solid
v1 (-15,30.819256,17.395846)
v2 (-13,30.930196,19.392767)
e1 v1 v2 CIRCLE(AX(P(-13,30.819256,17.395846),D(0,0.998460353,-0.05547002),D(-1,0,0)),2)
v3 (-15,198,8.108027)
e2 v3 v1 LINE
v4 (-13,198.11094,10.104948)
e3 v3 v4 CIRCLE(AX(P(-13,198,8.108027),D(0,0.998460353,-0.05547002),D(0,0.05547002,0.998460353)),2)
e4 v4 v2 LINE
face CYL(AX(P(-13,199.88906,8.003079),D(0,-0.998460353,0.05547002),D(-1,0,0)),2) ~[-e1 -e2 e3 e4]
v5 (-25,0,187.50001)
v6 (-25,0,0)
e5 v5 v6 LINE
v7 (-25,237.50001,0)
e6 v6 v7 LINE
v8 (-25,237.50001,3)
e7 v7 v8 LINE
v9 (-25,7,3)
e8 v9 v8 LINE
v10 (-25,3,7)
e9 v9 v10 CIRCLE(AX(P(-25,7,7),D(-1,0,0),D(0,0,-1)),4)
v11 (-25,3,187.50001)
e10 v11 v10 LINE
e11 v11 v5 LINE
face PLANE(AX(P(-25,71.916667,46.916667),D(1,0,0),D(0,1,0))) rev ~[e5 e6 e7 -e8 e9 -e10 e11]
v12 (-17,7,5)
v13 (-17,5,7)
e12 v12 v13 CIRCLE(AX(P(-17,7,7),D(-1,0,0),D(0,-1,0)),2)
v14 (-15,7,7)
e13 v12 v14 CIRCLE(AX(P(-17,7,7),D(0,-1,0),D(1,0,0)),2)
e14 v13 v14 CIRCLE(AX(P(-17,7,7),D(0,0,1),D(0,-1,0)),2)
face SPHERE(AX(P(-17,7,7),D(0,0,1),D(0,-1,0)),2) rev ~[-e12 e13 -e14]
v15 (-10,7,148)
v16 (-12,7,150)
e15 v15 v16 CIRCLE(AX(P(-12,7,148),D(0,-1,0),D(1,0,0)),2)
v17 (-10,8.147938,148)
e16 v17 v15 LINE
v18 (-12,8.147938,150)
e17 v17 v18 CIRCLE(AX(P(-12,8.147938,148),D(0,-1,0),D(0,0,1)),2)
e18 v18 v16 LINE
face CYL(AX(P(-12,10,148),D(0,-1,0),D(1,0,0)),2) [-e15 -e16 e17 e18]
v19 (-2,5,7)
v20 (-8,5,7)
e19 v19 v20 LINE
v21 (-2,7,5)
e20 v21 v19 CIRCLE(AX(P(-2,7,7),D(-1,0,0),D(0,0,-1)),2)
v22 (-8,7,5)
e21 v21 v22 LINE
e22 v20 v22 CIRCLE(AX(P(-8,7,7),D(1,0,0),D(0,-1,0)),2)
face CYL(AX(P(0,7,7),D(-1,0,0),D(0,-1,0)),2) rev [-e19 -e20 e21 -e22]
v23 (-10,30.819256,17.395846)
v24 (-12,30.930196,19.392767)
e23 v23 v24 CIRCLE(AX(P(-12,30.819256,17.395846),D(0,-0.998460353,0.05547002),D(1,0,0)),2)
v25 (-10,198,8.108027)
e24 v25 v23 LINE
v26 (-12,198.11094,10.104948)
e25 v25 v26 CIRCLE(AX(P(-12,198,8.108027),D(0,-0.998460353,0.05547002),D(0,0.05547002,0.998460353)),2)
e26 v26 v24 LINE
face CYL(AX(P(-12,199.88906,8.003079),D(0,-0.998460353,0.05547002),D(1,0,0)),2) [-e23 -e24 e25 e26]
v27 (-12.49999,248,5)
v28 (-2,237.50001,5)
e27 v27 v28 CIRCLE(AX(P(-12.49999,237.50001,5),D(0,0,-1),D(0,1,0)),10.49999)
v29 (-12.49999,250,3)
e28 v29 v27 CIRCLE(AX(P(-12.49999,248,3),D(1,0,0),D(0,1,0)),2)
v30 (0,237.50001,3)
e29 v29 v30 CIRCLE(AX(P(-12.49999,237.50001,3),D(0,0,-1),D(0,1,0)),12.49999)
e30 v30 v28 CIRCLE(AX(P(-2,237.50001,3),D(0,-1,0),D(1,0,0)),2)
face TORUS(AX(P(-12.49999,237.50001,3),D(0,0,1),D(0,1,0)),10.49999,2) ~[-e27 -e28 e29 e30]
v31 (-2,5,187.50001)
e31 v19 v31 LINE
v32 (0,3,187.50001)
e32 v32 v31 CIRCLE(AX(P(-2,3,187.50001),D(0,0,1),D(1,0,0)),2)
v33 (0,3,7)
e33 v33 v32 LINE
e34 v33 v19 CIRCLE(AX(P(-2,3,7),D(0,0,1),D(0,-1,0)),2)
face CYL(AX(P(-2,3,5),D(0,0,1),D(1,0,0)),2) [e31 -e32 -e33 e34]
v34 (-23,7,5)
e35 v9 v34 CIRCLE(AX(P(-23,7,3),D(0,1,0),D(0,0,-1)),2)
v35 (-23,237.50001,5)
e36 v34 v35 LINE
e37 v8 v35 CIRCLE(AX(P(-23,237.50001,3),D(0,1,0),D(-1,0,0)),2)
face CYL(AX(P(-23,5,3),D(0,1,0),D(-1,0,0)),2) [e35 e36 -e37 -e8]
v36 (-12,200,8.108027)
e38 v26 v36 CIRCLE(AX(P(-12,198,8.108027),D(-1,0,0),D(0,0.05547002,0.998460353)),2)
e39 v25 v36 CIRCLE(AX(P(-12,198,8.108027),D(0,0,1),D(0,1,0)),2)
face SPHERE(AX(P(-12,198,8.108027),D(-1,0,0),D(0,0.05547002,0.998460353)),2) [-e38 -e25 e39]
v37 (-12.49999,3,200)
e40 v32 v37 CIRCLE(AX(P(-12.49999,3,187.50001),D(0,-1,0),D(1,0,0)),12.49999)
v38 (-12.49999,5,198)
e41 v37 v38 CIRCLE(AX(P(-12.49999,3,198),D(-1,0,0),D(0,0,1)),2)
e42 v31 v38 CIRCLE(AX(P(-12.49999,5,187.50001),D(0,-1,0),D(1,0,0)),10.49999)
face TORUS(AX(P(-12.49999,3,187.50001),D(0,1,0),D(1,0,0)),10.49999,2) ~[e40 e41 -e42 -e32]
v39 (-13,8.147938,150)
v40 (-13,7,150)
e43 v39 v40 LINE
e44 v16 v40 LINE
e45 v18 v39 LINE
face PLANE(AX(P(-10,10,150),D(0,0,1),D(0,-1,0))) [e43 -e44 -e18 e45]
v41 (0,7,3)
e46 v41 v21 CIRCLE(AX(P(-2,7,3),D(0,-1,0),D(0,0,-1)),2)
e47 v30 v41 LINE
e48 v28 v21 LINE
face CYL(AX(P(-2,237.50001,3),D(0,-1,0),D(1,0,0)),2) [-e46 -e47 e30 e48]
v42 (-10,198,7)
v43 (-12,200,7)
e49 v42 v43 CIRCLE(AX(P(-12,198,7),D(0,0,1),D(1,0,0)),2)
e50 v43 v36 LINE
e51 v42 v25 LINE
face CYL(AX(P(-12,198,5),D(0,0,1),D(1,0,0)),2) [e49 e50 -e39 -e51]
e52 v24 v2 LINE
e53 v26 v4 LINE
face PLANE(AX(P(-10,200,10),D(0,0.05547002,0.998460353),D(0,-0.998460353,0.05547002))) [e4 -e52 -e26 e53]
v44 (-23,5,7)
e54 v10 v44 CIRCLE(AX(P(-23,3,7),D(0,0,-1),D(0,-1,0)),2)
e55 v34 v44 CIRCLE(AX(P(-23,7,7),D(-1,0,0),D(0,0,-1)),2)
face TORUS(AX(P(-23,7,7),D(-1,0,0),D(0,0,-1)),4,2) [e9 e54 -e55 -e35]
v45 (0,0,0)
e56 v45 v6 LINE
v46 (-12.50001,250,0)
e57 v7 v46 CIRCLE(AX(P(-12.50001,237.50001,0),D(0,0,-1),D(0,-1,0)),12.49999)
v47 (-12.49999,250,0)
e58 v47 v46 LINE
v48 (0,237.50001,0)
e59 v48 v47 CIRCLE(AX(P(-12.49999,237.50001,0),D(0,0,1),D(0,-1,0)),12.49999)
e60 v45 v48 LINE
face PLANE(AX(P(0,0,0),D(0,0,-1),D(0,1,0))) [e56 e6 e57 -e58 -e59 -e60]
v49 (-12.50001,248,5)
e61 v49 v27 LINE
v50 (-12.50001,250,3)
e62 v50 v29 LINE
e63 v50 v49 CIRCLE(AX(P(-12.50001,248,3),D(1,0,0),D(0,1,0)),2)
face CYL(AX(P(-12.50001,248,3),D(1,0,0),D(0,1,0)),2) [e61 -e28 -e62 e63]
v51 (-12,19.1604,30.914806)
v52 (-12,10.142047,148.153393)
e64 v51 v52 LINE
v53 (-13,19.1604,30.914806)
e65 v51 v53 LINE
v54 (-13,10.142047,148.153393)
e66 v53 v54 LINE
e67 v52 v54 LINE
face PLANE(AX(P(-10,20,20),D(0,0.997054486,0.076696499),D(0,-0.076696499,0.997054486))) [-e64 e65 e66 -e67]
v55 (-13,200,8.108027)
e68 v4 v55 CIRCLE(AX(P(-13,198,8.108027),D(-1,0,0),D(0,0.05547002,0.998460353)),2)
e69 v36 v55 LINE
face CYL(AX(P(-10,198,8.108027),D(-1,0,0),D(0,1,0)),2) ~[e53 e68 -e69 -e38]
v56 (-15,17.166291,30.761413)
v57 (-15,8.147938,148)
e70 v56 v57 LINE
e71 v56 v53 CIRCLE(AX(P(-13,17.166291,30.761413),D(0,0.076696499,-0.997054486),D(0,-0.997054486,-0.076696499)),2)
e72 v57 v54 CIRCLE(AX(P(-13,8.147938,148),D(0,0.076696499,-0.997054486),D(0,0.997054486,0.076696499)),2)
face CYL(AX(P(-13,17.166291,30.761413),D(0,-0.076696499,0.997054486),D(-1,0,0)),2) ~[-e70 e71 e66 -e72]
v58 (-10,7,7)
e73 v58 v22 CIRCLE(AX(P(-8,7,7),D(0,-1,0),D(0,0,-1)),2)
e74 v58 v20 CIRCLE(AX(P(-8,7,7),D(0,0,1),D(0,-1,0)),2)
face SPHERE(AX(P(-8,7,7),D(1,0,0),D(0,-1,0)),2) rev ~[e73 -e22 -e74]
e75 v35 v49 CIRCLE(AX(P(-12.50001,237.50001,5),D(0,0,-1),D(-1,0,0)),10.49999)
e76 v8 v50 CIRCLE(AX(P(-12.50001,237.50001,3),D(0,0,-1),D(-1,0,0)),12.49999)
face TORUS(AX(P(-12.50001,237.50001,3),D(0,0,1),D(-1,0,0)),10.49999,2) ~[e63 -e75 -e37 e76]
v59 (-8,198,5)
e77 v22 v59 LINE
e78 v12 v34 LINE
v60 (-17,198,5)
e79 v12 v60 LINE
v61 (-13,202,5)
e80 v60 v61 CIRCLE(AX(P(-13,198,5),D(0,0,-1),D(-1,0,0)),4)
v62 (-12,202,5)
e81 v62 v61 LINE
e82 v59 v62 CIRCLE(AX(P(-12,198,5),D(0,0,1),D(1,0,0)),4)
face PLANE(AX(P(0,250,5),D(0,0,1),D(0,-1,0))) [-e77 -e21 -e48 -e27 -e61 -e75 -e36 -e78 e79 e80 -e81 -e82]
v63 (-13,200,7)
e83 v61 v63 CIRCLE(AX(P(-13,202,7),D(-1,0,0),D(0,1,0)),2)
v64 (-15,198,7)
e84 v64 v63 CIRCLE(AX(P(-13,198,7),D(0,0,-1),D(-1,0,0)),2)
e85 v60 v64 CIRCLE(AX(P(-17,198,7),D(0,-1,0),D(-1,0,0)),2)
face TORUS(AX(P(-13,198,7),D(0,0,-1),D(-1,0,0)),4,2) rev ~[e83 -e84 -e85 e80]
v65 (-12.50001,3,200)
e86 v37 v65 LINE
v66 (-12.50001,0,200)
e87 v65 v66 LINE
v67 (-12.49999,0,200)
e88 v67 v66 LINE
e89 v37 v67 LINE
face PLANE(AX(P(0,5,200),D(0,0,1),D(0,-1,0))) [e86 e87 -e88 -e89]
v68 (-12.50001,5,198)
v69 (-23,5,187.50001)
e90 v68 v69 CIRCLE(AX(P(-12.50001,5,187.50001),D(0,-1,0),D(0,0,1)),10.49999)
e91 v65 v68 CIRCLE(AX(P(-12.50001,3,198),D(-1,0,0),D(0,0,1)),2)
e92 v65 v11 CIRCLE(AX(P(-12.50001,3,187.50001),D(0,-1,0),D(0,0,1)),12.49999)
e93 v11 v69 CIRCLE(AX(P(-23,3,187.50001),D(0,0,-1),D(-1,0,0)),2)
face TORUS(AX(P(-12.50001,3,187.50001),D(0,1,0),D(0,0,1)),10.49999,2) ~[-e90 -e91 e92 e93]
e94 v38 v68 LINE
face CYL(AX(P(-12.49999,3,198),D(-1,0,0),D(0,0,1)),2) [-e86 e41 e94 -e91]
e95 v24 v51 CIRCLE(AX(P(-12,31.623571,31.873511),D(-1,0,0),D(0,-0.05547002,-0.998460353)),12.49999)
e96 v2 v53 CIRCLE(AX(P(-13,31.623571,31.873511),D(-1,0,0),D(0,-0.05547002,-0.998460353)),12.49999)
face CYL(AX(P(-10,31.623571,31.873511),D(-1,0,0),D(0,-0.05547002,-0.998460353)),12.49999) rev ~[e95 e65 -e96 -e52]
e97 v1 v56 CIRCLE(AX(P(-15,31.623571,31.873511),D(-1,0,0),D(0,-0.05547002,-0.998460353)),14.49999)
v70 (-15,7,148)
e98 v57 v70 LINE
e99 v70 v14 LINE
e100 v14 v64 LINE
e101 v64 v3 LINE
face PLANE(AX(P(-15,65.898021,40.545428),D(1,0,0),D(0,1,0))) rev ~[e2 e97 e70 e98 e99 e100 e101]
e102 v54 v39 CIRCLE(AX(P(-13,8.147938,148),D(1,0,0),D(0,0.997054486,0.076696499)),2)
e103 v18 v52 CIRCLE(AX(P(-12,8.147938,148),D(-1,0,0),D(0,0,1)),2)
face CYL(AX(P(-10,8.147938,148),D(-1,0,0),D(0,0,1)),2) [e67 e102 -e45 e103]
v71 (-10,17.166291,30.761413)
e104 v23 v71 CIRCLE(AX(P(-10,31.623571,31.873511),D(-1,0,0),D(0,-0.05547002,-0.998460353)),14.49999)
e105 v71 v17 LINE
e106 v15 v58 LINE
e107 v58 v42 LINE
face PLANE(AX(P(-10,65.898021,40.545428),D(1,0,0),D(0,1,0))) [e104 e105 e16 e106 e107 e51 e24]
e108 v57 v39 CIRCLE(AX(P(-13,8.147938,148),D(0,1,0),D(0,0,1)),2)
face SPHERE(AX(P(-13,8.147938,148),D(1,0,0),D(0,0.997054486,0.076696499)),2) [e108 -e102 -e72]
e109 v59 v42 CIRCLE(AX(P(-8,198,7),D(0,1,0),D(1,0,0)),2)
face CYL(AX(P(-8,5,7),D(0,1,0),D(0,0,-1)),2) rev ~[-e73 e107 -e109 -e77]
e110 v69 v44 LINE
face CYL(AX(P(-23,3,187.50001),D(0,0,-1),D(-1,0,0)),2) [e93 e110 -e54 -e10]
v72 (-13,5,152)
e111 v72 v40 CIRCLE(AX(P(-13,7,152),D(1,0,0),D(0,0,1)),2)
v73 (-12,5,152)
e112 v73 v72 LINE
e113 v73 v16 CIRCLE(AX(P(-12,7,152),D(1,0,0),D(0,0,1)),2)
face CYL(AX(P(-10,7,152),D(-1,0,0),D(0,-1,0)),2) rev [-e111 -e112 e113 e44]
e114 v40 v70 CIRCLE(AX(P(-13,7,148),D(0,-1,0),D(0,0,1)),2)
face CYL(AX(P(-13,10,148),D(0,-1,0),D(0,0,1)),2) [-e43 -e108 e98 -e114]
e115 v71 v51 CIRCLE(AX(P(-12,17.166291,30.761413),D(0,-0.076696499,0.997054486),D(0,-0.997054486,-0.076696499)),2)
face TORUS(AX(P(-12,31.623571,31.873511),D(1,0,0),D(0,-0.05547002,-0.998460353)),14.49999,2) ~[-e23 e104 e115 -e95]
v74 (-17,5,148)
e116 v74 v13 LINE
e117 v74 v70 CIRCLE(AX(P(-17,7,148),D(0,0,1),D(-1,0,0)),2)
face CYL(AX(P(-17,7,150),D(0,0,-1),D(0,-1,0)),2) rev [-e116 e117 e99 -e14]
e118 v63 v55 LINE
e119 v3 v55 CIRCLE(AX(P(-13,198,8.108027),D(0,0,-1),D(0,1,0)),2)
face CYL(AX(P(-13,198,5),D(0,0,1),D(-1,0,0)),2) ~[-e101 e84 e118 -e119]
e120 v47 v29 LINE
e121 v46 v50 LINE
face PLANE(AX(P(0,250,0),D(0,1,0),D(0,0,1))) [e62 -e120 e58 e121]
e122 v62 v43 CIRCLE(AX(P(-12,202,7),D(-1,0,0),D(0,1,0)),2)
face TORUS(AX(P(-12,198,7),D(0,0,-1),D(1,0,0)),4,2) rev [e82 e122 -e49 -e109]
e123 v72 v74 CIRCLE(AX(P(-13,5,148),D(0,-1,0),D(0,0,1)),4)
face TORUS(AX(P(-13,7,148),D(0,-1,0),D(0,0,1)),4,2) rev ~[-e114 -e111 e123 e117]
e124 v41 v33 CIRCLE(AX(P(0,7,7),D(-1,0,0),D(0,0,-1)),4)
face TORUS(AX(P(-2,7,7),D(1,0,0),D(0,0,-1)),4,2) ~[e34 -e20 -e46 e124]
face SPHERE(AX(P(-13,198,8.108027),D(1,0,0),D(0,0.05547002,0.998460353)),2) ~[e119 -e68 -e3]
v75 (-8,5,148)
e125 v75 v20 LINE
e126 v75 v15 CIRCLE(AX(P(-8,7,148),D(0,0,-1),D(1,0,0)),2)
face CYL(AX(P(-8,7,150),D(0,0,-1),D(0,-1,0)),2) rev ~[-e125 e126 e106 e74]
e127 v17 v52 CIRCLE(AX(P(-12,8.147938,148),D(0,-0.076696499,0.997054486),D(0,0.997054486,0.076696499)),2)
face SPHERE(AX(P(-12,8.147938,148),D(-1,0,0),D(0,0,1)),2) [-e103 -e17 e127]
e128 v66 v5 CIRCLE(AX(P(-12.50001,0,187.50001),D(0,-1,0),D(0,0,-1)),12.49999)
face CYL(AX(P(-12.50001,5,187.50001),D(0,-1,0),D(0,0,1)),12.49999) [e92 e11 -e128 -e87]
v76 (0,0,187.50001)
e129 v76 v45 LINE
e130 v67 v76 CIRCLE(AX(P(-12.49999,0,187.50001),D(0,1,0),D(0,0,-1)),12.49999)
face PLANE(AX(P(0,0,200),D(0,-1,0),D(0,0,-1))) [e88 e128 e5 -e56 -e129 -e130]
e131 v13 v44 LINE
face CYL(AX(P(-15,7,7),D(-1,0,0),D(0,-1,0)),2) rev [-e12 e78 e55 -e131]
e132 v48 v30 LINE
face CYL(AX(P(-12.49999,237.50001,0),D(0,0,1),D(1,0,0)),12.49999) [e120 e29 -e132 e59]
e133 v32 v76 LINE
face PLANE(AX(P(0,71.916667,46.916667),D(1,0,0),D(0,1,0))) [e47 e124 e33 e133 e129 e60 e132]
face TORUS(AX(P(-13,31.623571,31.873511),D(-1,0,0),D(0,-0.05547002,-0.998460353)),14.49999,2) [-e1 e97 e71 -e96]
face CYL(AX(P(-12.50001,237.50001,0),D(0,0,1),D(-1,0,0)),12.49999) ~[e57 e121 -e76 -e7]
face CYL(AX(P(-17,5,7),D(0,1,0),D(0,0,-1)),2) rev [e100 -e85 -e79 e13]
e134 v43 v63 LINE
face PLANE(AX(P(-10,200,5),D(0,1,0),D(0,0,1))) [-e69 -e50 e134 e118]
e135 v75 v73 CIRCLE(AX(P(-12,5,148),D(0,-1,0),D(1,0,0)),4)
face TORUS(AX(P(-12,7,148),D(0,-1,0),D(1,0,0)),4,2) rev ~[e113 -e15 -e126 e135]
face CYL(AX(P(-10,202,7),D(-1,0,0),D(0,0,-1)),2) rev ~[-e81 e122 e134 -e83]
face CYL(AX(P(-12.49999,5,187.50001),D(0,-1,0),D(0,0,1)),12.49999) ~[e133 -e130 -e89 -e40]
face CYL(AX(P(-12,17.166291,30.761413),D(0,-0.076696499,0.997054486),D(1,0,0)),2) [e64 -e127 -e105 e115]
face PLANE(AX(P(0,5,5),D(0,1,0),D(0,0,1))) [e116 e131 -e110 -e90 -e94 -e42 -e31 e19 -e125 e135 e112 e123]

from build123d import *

# Parameters (mm, degrees)
F1_DEPTH = 25
F4_DEPTH = 5
F5_R     = 12.49999
F6_R     = 2


# Not quite as in the source:
# - a fillet or chamfer is up to 0.001 mm smaller than in the source, because OpenCascade refuses the exact size


with BuildPart() as f1:
    # F0 (on Right) → F1 (new body)
    with BuildSketch(Plane.YZ):
        Polygon((0, 200), (0, 0), (250, 0), (250, 5), (5, 5), (5, 200), align=None)
    extrude(amount=-F1_DEPTH)

    # F3 (on offset) → F4 (join)
    with BuildSketch(Plane.YZ.offset(-10)):
        Polygon((10, 150), (5, 150), (5, 5), (200, 5), (200, 10), (20, 20), align=None)
    extrude(amount=-F4_DEPTH)

    # F5 (radius 12.5 in the source; OpenCascade refuses exactly that, so slightly less here)
    f5_edges = [f1.edges().sort_by_distance(p)[0] for p in [
        (0, 2.5, 200),
        (-25, 2.5, 200),
        (-25, 250, 2.5),
        (0, 250, 2.5),
        (-12.5, 20, 20),
    ]]
    fillet(f5_edges, radius=F5_R)

    # F6
    f6_edges = [f1.edges().sort_by_distance(p)[0] for p in [
        (0, 5, 96.250005),
        (-3.661162, 5, 196.338838),
        (-5, 5, 5),
        (-12.5, 5, 200),
        (-10, 5, 77.5),
        (-21.338838, 5, 196.338838),
        (-12.5, 5, 150),
        (-25, 5, 96.250005),
        (-15, 5, 77.5),
        (-20, 5, 5),
        (-10, 14.5802, 90.457403),
        (-12.5, 19.1604, 30.914806),
        (-12.5, 10, 150),
        (-15, 14.5802, 90.457403),
        (-15, 115.465098, 14.696383),
        (-15, 22.879257, 22.94117),
        (-15, 200, 7.5),
        (-15, 102.5, 5),
        (-15, 7.5, 150),
        (-10, 115.465098, 14.696383),
        (-10, 22.879257, 22.94117),
        (-10, 200, 7.5),
        (-10, 102.5, 5),
        (-10, 7.5, 150),
        (0, 121.250005, 5),
        (-3.661162, 246.338838, 5),
        (-12.5, 250, 5),
        (-21.338838, 246.338838, 5),
        (-12.5, 200, 5),
        (-25, 121.250005, 5),
        (-12.5, 200, 10),
    ]]
    fillet(f6_edges, radius=F6_R)


solid = f1.part
